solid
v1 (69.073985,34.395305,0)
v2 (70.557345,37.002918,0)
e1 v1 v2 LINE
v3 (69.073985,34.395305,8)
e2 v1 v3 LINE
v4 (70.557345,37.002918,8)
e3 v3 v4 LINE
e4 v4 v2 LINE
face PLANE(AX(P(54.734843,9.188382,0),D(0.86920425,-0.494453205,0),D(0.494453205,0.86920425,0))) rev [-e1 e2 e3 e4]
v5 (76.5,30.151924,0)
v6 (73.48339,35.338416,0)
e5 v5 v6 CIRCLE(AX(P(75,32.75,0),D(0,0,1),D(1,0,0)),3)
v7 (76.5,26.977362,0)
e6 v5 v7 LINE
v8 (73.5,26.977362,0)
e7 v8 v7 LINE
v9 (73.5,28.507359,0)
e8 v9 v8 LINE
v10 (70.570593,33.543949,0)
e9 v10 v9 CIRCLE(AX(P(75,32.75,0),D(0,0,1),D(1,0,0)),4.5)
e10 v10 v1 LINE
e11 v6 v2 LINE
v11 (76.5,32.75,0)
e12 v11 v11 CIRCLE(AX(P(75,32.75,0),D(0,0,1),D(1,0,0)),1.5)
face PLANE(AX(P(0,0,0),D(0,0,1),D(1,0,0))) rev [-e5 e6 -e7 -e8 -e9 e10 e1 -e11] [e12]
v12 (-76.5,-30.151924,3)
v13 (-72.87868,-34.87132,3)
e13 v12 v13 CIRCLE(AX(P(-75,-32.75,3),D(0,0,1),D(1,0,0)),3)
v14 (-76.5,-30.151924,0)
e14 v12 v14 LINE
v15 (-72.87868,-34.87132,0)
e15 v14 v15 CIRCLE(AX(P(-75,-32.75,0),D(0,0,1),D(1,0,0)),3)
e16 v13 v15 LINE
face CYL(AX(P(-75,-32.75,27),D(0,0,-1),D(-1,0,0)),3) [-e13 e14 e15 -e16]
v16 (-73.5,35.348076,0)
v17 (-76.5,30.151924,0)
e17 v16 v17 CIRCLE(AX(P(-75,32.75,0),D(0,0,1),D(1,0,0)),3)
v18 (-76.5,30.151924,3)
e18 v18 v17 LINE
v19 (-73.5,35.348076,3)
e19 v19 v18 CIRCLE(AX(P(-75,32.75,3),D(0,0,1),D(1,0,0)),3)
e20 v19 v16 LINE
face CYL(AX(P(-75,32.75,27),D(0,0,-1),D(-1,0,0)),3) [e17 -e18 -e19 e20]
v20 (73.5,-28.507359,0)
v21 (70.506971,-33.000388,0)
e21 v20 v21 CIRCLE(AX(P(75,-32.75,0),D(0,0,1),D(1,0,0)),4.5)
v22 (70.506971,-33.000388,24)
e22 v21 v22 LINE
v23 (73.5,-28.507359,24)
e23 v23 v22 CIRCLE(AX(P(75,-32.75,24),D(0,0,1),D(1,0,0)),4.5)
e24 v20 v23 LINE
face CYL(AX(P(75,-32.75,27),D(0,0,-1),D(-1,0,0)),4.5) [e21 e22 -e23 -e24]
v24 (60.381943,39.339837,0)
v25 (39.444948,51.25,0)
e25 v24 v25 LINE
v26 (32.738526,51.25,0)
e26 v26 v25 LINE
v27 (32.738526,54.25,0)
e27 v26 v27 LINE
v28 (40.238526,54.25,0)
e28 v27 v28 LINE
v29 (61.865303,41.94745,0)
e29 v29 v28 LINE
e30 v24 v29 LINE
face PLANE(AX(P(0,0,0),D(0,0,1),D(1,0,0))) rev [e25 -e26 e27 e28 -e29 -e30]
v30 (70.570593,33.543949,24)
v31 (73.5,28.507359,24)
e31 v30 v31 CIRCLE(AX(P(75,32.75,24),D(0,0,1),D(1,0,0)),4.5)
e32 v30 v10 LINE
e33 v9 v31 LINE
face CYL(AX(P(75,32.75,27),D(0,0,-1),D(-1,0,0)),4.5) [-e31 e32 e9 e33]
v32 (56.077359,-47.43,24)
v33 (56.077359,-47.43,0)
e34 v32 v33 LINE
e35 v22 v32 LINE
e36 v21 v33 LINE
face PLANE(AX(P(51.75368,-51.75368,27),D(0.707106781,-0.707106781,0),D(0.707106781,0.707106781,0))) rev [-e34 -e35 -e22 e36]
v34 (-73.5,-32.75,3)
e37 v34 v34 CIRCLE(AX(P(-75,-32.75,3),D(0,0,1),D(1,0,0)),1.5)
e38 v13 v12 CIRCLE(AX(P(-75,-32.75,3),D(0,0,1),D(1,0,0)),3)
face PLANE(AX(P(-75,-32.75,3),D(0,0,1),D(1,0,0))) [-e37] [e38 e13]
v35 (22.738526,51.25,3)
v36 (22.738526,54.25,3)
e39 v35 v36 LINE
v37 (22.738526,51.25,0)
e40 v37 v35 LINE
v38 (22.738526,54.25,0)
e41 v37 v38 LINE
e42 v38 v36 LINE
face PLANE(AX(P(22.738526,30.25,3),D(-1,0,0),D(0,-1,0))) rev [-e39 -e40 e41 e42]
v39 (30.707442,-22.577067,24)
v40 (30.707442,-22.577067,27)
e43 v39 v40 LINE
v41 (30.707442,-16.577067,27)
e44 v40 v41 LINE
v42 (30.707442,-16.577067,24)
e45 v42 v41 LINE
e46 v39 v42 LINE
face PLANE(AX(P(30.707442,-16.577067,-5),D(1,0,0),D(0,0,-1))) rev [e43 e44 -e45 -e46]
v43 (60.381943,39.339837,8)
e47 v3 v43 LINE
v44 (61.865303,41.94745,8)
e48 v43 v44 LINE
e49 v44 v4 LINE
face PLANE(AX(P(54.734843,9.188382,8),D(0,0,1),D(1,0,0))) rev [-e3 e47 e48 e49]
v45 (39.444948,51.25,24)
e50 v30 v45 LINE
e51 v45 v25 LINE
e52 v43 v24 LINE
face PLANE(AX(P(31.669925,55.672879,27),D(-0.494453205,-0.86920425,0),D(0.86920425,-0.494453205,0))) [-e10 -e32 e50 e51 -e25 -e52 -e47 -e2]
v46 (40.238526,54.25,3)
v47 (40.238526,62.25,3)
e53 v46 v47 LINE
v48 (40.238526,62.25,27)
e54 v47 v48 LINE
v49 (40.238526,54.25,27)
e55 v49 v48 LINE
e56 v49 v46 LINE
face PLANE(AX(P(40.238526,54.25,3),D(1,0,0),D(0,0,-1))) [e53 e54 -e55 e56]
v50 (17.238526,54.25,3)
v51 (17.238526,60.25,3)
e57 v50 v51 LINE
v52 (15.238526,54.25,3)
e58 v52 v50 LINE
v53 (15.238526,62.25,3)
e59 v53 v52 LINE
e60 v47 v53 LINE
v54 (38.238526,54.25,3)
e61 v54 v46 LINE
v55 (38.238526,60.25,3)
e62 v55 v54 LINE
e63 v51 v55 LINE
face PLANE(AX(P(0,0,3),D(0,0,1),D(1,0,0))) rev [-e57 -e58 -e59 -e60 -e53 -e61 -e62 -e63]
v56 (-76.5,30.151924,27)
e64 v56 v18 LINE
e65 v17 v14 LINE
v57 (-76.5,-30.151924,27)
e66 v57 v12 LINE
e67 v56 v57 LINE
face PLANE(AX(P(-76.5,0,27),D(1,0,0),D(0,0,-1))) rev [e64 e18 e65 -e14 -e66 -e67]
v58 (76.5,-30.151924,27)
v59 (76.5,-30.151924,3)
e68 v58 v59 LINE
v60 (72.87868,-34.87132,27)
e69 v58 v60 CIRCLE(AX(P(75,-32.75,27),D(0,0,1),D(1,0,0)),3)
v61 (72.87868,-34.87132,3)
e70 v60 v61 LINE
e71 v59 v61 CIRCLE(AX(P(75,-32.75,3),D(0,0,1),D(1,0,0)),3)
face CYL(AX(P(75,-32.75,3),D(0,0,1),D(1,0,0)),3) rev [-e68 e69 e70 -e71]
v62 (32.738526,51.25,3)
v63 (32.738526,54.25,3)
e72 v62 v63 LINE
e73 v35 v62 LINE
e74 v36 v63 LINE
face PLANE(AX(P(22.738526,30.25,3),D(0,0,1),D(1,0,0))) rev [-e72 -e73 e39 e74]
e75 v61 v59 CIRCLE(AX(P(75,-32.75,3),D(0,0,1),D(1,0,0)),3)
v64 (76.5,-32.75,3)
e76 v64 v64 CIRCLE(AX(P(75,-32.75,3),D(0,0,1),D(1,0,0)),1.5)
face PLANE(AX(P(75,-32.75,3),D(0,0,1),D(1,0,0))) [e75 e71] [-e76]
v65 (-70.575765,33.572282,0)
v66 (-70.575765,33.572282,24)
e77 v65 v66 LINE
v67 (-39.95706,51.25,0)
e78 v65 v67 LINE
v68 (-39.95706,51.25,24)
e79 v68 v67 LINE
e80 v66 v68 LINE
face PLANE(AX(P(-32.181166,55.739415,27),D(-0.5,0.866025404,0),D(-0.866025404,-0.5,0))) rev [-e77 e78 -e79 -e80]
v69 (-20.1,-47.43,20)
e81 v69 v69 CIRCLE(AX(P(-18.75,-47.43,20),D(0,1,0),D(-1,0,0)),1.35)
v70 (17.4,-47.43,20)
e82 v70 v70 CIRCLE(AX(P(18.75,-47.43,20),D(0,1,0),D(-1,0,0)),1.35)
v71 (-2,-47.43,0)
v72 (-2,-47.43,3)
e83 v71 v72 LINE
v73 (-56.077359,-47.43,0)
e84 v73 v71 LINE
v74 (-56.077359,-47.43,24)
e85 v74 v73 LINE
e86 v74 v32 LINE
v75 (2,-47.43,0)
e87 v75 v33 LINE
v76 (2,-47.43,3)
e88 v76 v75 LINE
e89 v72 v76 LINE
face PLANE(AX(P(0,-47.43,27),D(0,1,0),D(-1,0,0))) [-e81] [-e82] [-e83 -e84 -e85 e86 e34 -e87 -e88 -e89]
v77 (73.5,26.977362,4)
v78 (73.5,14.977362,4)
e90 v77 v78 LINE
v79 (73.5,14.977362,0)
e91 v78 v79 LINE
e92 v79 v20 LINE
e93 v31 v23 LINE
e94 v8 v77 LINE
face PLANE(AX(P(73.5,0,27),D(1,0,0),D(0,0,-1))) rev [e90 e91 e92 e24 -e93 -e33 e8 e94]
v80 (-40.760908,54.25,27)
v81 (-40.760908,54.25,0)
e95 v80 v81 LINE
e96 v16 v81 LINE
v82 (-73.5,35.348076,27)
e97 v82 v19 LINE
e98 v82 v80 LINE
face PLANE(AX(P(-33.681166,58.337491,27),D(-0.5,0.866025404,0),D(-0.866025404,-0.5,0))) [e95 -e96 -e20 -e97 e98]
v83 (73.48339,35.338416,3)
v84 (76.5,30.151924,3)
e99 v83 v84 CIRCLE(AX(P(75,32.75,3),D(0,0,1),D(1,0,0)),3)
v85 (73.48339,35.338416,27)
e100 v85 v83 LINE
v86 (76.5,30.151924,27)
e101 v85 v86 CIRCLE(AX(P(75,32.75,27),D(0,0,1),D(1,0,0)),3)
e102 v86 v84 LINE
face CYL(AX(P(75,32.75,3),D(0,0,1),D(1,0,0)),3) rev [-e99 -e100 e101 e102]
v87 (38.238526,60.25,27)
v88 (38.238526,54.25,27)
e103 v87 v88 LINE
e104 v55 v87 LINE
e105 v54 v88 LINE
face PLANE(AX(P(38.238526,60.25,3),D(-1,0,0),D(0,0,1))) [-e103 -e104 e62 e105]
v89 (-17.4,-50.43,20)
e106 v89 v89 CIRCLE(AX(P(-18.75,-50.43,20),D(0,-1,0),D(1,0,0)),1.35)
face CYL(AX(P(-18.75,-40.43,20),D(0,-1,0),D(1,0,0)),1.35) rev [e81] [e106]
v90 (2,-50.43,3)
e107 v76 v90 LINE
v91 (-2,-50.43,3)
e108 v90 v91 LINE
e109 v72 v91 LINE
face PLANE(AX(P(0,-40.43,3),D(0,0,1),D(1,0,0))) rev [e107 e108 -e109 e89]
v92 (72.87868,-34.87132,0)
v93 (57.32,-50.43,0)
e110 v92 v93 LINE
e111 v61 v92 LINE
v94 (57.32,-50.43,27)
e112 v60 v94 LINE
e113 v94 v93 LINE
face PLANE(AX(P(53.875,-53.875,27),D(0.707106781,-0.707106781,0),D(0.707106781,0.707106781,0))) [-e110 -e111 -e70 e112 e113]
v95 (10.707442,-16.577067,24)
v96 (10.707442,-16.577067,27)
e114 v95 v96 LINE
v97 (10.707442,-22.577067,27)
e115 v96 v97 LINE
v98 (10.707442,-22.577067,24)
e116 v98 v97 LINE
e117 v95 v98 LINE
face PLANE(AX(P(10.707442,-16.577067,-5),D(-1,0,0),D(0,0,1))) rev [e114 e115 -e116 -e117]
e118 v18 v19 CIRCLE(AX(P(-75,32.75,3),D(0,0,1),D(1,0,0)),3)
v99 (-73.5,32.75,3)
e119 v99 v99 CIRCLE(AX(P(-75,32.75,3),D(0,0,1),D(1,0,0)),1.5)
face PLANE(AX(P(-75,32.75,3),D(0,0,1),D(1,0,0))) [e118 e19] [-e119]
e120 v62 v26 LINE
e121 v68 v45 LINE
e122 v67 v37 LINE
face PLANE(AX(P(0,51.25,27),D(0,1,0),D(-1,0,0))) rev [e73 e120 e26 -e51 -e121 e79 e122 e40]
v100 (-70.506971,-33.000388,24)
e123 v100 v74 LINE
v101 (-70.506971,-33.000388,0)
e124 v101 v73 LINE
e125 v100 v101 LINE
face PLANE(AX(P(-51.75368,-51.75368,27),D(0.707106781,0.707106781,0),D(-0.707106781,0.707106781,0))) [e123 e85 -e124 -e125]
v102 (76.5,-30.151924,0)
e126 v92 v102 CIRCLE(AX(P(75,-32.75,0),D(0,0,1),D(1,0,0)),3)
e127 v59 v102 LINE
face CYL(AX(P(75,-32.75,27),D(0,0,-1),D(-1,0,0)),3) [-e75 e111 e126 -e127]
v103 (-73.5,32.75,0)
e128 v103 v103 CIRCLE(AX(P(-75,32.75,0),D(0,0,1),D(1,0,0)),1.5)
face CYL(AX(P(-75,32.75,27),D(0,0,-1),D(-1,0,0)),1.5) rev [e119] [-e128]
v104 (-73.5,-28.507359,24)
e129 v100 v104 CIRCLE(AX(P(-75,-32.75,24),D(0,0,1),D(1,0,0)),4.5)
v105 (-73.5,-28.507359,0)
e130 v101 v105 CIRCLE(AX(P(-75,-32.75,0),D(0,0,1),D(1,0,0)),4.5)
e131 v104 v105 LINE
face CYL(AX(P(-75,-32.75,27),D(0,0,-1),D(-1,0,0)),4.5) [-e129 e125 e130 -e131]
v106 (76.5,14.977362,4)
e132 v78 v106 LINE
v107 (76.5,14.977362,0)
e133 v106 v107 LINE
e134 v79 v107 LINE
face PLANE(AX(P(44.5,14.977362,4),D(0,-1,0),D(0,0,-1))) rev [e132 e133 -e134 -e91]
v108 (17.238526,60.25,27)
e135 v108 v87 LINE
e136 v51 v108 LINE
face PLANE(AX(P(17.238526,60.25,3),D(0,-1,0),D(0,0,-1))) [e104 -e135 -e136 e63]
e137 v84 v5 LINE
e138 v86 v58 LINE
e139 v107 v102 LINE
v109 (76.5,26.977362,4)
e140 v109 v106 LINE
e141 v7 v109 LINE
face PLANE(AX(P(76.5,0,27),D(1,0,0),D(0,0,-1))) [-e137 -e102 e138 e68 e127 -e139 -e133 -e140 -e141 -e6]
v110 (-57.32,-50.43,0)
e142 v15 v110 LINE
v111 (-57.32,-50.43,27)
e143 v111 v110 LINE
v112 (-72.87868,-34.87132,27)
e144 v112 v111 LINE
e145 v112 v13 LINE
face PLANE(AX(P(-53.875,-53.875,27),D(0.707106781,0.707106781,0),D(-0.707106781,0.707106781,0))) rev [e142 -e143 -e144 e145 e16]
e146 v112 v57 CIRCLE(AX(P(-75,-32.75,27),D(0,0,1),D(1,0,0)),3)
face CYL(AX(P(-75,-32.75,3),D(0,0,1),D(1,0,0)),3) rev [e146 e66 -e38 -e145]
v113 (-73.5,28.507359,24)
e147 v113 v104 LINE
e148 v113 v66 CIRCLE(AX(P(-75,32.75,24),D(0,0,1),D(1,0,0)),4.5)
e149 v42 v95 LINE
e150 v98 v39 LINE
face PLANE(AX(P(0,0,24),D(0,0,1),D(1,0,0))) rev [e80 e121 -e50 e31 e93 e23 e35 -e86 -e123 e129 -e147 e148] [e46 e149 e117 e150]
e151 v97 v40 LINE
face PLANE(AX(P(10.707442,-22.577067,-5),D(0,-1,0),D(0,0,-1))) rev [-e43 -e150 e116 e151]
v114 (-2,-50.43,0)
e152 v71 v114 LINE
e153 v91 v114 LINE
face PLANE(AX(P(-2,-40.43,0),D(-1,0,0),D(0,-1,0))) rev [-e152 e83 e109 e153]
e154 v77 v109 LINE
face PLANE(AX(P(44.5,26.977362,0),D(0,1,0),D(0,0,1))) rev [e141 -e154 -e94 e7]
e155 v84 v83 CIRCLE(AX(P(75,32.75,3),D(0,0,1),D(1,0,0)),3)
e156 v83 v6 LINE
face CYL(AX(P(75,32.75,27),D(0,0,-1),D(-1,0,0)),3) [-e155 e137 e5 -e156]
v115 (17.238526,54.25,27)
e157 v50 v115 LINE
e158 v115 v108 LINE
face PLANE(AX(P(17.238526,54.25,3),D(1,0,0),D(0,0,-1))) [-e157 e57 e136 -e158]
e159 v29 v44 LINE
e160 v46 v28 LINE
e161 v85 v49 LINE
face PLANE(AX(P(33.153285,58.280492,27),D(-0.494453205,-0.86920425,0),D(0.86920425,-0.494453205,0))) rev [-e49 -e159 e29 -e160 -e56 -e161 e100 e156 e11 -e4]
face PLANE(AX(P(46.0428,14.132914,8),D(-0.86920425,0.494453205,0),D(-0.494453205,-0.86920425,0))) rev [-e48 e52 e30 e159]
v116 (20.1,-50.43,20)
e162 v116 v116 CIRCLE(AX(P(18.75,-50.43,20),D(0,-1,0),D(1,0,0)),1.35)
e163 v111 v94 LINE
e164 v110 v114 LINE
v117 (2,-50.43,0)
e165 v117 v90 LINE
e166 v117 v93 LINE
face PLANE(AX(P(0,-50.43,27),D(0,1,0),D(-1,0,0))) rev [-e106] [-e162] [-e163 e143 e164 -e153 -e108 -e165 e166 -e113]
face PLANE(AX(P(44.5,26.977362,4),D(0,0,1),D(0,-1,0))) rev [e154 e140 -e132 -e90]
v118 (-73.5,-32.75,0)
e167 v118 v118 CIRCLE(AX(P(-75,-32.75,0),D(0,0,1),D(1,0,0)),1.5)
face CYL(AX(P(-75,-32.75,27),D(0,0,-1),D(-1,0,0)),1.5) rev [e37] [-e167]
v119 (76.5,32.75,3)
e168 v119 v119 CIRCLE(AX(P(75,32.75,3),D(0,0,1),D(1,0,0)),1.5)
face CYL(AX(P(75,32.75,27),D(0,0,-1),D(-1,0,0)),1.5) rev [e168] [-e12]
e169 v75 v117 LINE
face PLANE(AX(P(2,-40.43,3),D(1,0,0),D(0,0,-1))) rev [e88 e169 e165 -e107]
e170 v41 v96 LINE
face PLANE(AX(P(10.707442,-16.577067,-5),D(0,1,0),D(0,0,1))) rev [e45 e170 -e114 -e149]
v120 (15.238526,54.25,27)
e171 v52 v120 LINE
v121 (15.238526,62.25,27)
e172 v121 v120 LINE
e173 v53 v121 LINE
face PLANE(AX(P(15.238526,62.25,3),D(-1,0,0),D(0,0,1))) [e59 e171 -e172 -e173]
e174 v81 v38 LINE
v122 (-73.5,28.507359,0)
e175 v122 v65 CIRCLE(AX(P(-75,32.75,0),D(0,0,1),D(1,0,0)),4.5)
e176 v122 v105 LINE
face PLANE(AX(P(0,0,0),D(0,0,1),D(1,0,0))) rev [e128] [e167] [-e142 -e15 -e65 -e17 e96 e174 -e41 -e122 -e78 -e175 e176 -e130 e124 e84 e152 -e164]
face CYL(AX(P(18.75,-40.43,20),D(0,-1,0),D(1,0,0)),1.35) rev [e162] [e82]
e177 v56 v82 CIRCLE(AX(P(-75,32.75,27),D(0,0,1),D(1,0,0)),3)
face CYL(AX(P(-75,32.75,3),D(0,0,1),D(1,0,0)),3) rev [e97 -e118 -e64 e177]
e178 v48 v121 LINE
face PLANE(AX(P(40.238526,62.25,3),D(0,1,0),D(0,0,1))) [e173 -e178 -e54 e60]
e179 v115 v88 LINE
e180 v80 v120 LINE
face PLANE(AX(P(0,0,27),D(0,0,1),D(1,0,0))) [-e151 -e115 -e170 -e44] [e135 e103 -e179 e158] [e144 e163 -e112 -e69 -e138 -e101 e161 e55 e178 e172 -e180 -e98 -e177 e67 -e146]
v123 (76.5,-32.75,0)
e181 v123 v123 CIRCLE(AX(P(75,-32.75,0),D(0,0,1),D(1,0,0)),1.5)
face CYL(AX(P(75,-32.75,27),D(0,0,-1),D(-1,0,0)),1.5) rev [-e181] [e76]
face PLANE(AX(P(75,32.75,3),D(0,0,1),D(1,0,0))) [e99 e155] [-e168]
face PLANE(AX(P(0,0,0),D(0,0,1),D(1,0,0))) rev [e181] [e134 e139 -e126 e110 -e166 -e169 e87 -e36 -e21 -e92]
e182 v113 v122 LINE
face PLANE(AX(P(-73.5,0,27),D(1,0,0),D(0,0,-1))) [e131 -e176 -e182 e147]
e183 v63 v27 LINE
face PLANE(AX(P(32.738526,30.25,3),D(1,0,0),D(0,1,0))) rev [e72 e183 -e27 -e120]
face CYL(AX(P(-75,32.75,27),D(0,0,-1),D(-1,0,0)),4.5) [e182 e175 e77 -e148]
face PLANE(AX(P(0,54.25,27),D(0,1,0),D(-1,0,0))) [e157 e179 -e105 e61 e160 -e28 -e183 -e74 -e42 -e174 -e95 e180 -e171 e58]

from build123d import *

# Parameters (mm, degrees)
SKETCH_2_R          = 1.5
EXTRUDE_1_DEPTH     = 27
SHELL_1_DEPTH       = 24
CUT_EXTRUDE_START   = -24
SKETCH_3_R          = 3
CUT_EXTRUDE_1_DEPTH = 24
SKETCH_5_W          = 20
SKETCH_5_H          = 6
CUT_EXTRUDE_3_DEPTH = 32
SKETCH_6_W          = 4
SKETCH_6_H          = 12
CUT_EXTRUDE_4_DEPTH = 32
SKETCH_7_W          = 10
SKETCH_7_H          = 8
CUT_EXTRUDE_5_DEPTH = 32
EXTRUDE_2_DEPTH     = 24
SKETCH_9_W          = 10
SKETCH_9_H          = 3
CUT_EXTRUDE_6_DEPTH = 24
SKETCH_10_R         = 1.35
CUT_EXTRUDE_7_DEPTH = 10
CUT_EXTRUDE_8_DEPTH = 10


# Read off the part's stored shape, not the designer's step: 抽壳1
with BuildPart() as part:
    # 草图2 → 凸台-拉伸1 (new body)
    with BuildSketch(Plane.XY):
        with BuildLine():
            Line((-76.5, 30.151923789), (-76.5, -30.151923789))
            ThreePointArc((-76.5, -30.151923789), (-77.380060021, -34.576284287), (-72.878679656, -34.871320344))
            Line((-72.878679656, -34.871320344), (-57.32, -50.43))
            Line((-57.32, -50.43), (57.32, -50.43))
            Line((57.32, -50.43), (72.878679656, -34.871320344))
            ThreePointArc((72.878679656, -34.871320344), (77.380060021, -34.576284287), (76.5, -30.151923789))
            Line((76.5, -30.151923789), (76.5, 30.151923789))
            ThreePointArc((76.5, 30.151923789), (77.593259199, 34.258312544), (73.483390382, 35.33841559))
            Line((73.483390382, 35.33841559), (40.238526366, 54.25))
            Line((40.238526366, 54.25), (-40.760907637, 54.25))
            Line((-40.760907637, 54.25), (-73.5, 35.348076211))
            ThreePointArc((-73.5, 35.348076211), (-77.598076211, 34.25), (-76.5, 30.151923789))
        make_face()
        with Locations((-75, 32.75)):
            Circle(SKETCH_2_R, mode=Mode.SUBTRACT)
        with Locations((75, 32.75)):
            Circle(SKETCH_2_R, mode=Mode.SUBTRACT)
        with Locations((75, -32.75)):
            Circle(SKETCH_2_R, mode=Mode.SUBTRACT)
        with Locations((-75, -32.75)):
            Circle(SKETCH_2_R, mode=Mode.SUBTRACT)
    extrude(amount=EXTRUDE_1_DEPTH)

    # 抽壳1 outline → 抽壳1 (cut)
    with BuildSketch(Plane.XY):
        with BuildLine():
            Line((-73.5, 28.507359313), (-73.5, -28.507359313))
            ThreePointArc((-73.5, -28.507359313), (-71.254879923, -30.255190266), (-70.506971411, -33.000387902))
            Line((-70.506971411, -33.000387902), (-56.077359313, -47.43))
            Line((-56.077359313, -47.43), (56.077359313, -47.43))
            Line((56.077359313, -47.43), (70.506971411, -33.000387902))
            ThreePointArc((70.506971411, -33.000387902), (71.254879923, -30.255190266), (73.5, -28.507359313))
            Line((73.5, -28.507359313), (73.5, 28.507359313))
            ThreePointArc((73.5, 28.507359313), (71.110106029, 30.48754008), (70.570593139, 33.543948905))
            Line((70.570593139, 33.543948905), (39.444948236, 51.25))
            Line((39.444948236, 51.25), (-39.95706006, 51.25))
            Line((-39.95706006, 51.25), (-70.575765386, 33.572282238))
            ThreePointArc((-70.575765386, 33.572282238), (-71.102885683, 30.5), (-73.5, 28.507359313))
        make_face()
    extrude(amount=SHELL_1_DEPTH, mode=Mode.SUBTRACT)

    # 草图3 → 切除-拉伸1 (cut)
    with BuildSketch(Plane.XY.offset(27).offset(CUT_EXTRUDE_START)):
        with Locations((75, 32.75)):
            Circle(SKETCH_3_R)
        with Locations((75, -32.75)):
            Circle(SKETCH_3_R)
        with Locations((-75, -32.75)):
            Circle(SKETCH_3_R)
        with Locations((-75, 32.75)):
            Circle(SKETCH_3_R)
    extrude(amount=CUT_EXTRUDE_1_DEPTH, mode=Mode.SUBTRACT)

    # 草图5 → 切除-拉伸3 (cut)
    with BuildSketch(Plane.XY.offset(27)):
        with Locations((20.7074416, -19.577067137)):
            Rectangle(SKETCH_5_W, SKETCH_5_H)
    extrude(amount=-CUT_EXTRUDE_3_DEPTH, mode=Mode.SUBTRACT)

    # 草图6 → 切除-拉伸4 (cut)
    with BuildSketch(Plane(origin=(76.5, 0, 0), x_dir=(0, 0, -1), z_dir=(1, 0, 0))):
        with Locations((-2, 20.977362477)):
            Rectangle(SKETCH_6_W, SKETCH_6_H)
    extrude(amount=-CUT_EXTRUDE_4_DEPTH, mode=Mode.SUBTRACT)

    # 草图7 → 切除-拉伸5 (cut)
    with BuildSketch(Plane(origin=(33.153284591, 58.280491682, 0), x_dir=(0.8692042501767389, -0.4944532045347601, 0), z_dir=(0.4944532045347601, 0.8692042501767389, 0))):
        with Locations((38.03253292, -4)):
            Rectangle(SKETCH_7_W, SKETCH_7_H)
    extrude(amount=-CUT_EXTRUDE_5_DEPTH, mode=Mode.SUBTRACT)

    # 草图8 → 凸台-拉伸2 (add)
    with BuildSketch(Plane.XY.offset(27)):
        Polygon((40.238526366, 54.25), (40.238526366, 62.25), (15.238526366, 62.25), (15.238526366, 54.25), (17.238526366, 54.25), (17.238526366, 60.25), (38.238526366, 60.25), (38.238526366, 54.25), align=None)
    extrude(amount=-EXTRUDE_2_DEPTH)

    # 草图9 → 切除-拉伸6 (cut)
    with BuildSketch(Plane(origin=(0, 54.25, 0), x_dir=(1, 0, 0), z_dir=(0, 1, 0))):
        with Locations((27.738526366, -1.5)):
            Rectangle(SKETCH_9_W, SKETCH_9_H)
    extrude(amount=-CUT_EXTRUDE_6_DEPTH, mode=Mode.SUBTRACT)

    # 草图10 → 切除-拉伸7 (cut)
    with BuildSketch(Plane.XZ.offset(50.43)):
        with Locations((-18.75, 20)):
            Circle(SKETCH_10_R)
        with Locations((18.75, 20)):
            Circle(SKETCH_10_R)
    extrude(amount=-CUT_EXTRUDE_7_DEPTH, mode=Mode.SUBTRACT)

    # 草图11 → 切除-拉伸8 (cut)
    with BuildSketch(Plane.XZ.offset(50.43)):
        Polygon((0, 3), (2, 3), (2, 0), (-2, 0), (-2, 3), align=None)
    extrude(amount=-CUT_EXTRUDE_8_DEPTH, mode=Mode.SUBTRACT)


solid = part.part
